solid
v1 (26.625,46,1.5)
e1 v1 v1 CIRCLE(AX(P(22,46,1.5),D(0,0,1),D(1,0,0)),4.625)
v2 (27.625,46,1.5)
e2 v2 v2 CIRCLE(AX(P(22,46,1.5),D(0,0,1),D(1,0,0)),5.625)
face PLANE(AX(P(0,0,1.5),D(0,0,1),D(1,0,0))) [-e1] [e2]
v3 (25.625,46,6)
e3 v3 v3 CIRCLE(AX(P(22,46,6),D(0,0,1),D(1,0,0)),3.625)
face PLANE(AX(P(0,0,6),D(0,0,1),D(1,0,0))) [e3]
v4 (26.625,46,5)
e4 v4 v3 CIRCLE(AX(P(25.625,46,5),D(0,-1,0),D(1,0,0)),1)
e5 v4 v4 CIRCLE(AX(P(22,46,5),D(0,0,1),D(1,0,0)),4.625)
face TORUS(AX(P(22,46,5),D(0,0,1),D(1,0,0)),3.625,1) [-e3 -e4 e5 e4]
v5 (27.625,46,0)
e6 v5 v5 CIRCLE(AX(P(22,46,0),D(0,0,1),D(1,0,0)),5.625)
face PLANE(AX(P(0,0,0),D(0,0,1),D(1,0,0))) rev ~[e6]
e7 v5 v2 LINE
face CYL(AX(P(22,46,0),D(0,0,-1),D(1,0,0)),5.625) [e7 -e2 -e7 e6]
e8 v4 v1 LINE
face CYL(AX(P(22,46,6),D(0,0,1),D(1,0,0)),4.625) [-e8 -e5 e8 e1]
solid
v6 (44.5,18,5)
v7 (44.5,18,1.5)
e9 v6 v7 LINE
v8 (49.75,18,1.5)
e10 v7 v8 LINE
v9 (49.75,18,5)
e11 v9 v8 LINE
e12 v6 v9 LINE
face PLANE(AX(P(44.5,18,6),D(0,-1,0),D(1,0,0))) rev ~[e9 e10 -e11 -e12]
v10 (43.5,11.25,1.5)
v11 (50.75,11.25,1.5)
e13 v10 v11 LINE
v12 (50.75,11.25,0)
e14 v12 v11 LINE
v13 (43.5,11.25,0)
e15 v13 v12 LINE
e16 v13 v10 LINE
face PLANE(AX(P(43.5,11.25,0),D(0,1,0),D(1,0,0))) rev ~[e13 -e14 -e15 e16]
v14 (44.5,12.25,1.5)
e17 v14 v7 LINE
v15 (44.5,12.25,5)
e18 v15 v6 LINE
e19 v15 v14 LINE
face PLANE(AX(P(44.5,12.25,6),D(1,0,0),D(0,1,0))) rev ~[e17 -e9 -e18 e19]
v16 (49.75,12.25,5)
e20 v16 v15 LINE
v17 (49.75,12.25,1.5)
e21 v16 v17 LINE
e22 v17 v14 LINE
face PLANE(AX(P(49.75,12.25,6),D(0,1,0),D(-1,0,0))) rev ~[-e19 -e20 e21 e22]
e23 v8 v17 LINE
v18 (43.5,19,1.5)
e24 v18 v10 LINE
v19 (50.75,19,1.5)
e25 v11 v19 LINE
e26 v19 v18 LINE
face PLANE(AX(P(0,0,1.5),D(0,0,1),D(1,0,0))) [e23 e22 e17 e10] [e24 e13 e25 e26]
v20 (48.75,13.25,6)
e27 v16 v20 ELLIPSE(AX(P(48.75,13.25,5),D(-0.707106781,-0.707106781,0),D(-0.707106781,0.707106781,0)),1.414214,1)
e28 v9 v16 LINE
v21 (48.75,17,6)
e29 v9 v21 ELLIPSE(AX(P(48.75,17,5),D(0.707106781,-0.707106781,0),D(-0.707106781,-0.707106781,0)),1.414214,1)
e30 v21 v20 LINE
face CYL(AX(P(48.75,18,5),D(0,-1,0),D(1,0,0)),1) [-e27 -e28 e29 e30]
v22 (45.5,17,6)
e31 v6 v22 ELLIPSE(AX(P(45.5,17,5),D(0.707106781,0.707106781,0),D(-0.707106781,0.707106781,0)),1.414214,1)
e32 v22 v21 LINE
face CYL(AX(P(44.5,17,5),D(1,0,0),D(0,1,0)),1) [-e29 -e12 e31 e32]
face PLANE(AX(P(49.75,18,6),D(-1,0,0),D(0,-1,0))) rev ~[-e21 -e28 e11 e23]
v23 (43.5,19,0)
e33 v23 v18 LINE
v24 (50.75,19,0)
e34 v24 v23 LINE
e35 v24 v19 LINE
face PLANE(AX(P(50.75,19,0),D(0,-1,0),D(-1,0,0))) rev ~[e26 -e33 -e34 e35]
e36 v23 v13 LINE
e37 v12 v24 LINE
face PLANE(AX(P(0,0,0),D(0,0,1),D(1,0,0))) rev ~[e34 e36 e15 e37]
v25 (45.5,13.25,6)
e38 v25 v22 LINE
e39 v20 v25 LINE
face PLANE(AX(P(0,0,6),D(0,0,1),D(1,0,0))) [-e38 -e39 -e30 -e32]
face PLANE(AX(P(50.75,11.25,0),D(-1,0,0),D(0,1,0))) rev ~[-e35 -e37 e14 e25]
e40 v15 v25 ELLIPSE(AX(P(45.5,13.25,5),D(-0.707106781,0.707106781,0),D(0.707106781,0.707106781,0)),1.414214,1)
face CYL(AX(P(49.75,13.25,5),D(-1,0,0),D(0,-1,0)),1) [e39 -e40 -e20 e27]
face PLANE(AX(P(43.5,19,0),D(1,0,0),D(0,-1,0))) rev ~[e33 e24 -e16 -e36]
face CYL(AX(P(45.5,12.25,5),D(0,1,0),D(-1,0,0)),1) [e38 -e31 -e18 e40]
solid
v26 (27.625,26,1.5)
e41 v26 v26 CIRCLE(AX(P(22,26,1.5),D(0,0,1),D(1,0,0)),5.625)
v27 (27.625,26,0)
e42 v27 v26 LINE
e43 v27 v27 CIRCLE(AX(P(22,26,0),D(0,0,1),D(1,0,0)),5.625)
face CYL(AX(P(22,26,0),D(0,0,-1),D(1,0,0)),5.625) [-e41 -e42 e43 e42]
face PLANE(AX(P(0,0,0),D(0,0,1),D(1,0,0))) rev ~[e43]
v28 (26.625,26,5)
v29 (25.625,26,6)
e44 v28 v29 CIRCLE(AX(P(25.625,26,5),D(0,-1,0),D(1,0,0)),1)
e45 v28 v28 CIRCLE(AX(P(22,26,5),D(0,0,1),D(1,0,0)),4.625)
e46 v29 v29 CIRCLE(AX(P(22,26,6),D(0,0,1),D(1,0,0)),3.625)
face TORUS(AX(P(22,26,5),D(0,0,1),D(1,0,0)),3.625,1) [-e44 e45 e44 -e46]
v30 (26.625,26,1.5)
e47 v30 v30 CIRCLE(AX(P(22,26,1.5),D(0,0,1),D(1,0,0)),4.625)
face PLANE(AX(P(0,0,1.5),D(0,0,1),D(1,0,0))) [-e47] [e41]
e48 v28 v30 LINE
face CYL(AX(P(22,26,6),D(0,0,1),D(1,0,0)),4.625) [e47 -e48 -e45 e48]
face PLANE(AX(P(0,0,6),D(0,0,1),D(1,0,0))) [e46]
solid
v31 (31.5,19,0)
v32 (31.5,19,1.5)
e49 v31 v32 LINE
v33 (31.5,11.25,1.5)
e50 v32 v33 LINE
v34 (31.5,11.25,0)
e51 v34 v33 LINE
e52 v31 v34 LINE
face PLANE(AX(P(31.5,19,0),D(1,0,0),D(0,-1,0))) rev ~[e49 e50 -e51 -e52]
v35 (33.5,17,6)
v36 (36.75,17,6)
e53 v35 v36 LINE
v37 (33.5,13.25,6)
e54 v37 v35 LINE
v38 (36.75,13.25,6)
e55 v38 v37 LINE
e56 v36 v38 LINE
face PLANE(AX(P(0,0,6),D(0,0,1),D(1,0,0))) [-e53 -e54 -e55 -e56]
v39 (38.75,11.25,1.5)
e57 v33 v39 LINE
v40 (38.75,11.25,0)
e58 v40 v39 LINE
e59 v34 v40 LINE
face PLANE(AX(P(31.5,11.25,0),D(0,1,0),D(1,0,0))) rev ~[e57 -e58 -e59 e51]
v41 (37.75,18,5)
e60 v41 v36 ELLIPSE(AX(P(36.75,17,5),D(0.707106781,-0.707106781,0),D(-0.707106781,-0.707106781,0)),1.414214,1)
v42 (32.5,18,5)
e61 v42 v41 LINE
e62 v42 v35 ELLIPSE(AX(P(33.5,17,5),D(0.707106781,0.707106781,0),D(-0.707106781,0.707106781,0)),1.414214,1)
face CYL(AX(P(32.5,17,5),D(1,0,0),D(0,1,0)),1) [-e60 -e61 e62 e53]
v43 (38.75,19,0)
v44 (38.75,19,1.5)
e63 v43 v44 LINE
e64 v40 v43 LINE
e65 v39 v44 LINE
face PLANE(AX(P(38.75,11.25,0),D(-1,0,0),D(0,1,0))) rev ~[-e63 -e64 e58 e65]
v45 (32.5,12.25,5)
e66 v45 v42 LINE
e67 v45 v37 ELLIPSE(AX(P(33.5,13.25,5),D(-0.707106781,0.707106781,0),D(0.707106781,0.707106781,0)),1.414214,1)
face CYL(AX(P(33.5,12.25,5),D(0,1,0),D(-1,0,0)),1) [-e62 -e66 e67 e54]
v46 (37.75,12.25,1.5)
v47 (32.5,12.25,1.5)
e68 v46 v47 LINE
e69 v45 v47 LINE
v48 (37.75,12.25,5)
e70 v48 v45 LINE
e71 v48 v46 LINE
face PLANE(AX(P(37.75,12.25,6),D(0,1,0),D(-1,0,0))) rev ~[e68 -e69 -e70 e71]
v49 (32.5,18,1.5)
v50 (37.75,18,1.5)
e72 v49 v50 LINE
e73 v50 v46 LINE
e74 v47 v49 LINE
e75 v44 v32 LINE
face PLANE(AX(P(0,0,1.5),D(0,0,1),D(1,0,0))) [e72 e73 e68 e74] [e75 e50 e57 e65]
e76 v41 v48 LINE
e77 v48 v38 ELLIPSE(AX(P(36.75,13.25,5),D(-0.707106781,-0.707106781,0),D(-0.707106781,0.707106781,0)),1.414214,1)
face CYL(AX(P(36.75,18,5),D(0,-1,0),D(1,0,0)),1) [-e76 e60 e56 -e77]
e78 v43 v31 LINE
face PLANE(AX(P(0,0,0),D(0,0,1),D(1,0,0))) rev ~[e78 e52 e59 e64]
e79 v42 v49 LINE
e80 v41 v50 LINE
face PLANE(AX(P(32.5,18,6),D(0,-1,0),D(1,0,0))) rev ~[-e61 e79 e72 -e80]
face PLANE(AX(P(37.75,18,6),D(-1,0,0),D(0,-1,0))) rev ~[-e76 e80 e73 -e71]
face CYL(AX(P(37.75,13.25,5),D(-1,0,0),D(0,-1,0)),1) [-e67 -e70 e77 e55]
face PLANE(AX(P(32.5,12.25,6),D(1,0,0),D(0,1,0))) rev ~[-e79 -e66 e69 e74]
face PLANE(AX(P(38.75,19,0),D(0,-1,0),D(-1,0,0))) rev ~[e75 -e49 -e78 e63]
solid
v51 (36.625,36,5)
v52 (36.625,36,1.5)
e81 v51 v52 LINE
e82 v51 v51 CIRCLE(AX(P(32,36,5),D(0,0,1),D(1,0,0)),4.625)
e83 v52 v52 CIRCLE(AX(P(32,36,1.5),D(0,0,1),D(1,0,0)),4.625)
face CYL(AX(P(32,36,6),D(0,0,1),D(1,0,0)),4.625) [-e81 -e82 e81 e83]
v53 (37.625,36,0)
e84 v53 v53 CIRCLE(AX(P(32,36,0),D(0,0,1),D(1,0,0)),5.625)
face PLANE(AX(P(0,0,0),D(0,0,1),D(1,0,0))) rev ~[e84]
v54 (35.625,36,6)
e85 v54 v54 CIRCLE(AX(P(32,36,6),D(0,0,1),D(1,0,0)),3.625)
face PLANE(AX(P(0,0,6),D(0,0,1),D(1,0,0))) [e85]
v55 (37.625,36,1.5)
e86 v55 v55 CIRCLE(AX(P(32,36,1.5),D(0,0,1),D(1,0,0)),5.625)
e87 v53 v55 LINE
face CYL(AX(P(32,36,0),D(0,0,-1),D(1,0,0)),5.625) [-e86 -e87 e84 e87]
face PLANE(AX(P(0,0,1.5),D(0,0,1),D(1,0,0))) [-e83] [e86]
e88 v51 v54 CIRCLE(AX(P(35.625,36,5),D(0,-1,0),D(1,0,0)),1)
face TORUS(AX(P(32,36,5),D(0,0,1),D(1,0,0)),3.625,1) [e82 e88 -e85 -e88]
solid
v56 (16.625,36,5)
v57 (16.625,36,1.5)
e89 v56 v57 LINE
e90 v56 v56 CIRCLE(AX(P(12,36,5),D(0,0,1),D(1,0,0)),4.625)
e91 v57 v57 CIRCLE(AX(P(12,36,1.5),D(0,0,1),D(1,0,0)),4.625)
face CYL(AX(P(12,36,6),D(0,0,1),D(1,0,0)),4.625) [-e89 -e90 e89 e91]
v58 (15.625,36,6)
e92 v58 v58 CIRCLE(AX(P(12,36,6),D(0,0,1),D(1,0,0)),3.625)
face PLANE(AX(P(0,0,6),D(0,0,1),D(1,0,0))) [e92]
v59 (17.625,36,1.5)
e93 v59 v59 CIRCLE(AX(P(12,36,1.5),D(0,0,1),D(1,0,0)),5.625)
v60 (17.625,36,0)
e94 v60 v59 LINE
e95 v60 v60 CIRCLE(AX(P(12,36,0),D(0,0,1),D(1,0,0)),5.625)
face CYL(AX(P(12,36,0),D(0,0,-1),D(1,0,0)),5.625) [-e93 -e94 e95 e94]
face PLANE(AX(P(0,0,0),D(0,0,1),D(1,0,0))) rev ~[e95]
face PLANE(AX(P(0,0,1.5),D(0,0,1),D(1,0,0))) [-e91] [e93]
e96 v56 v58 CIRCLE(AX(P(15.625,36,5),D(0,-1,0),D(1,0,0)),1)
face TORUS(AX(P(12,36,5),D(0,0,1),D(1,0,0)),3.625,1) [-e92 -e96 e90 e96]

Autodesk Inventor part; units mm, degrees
ref_plane "YZ Plane" through (0, 0, 0) normal (1, 0, 0) x (0, 1, 0)
ref_plane "XZ Plane" through (0, 0, 0) normal (0, 1, 0) x (-1, 0, 0)
ref_plane "XY Plane" through (0, 0, 0) normal (0, 0, 1) x (1, 0, 0)
sketch "Sketch1" plane through (0, 0, 0) normal (0, 0, 1) x (1, 0, 0)
  circle A0 centre (22, 46) radius 4.5
  circle A1 centre (12, 36) radius 4.5
  circle A2 centre (22, 26) radius 4.5
  circle A3 centre (32, 36) radius 4.5
  line L0 (37.75, 18) -> (32.5, 18)
  line L1 (32.5, 18) -> (32.5, 12.25)
  line L2 (32.5, 12.25) -> (37.75, 12.25)
  line L3 (37.75, 12.25) -> (37.75, 18)
  line L4 (44.5, 18) -> (49.75, 18)
  line L5 (49.75, 18) -> (49.75, 12.25)
  line L6 (49.75, 12.25) -> (44.5, 12.25)
  line L7 (44.5, 12.25) -> (44.5, 18)
  circle A4 centre (12, 36) radius 5.625
  circle A5 centre (22, 46) radius 5.625
  circle A6 centre (32, 36) radius 5.625
  circle A7 centre (22, 26) radius 5.625
  line L8 (38.75, 19) -> (31.5, 19)
  line L9 (31.5, 19) -> (31.5, 11.25)
  line L10 (31.5, 11.25) -> (38.75, 11.25)
  line L11 (38.75, 11.25) -> (38.75, 19)
  line L12 (50.75, 19) -> (43.5, 19)
  line L13 (43.5, 19) -> (43.5, 11.25)
  line L14 (43.5, 11.25) -> (50.75, 11.25)
  line L15 (50.75, 11.25) -> (50.75, 19)
  point P0 (18.75, 39)
  point P1 (18.75, 32.5)
  dimension "d35" = 11.25
  dimension "d36" = 11.25
  dimension "d37" = 11.25
  dimension "d38" = 11.25
  dimension "d43" = 7.75
  dimension "d44" = 7.75
  dimension "d45" = 7.25
  dimension "d46" = 7.25
  dimension "d47" = 5.75
  dimension "d48" = 5.25
  dimension "d49" = 5.75
  dimension "d50" = 5.25
extrude "Extrusion1" add sketch "Sketch1" along normal blind 6 contours A0 | A1 | A2 | A3 | L3 L2 L1 L0 | L4 L5 L6 L7 | A4 | A5 | A6 | A7 | L11 L10 L9 L8 | L15 L14 L13 L12
sketch "Sketch2" plane through (0, 0, 6) normal (0, 0, 1) x (1, 0, 0)
  circle A0 centre (22, 46) radius 4.625
  circle A1 centre (12, 36) radius 4.625
  circle A2 centre (22, 26) radius 4.625
  circle A3 centre (32, 36) radius 4.625
  circle A4 centre (22, 46) radius 5.625
  circle A5 centre (12, 36) radius 5.625
  circle A6 centre (22, 26) radius 5.625
  circle A7 centre (32, 36) radius 5.625
  line L0 (31.5, 19) -> (31.5, 11.25) projected
  line L1 (38.75, 11.25) -> (38.75, 19) projected
  line L2 (31.5, 19) -> (38.75, 19)
  line L3 (38.75, 19) -> (38.75, 11.25)
  line L4 (38.75, 11.25) -> (31.5, 11.25)
  line L5 (31.5, 11.25) -> (31.5, 19)
  line L6 (50.75, 19) -> (43.5, 19) projected
  line L7 (43.5, 11.25) -> (50.75, 11.25) projected
  line L8 (43.5, 19) -> (50.75, 19)
  line L9 (50.75, 19) -> (50.75, 11.25)
  line L10 (50.75, 11.25) -> (43.5, 11.25)
  line L11 (43.5, 11.25) -> (43.5, 19)
  line L12 (37.75, 18) -> (32.5, 18)
  line L13 (32.5, 18) -> (32.5, 12.25)
  line L14 (32.5, 12.25) -> (37.75, 12.25)
  line L15 (37.75, 12.25) -> (37.75, 18)
  line L16 (44.5, 18) -> (49.75, 18)
  line L17 (49.75, 18) -> (49.75, 12.25)
  line L18 (49.75, 12.25) -> (44.5, 12.25)
  line L19 (44.5, 12.25) -> (44.5, 18)
  dimension "d16" = 1
  dimension "d17" = 1
  dimension "d18" = 1
  dimension "d19" = 1
  dimension "d39" = 11.25
  dimension "d40" = 11.25
  dimension "d41" = 11.25
  dimension "d42" = 11.25
  dimension "d51" = 1
  dimension "d52" = 1
extrude "Extrusion2" cut sketch "Sketch2" against normal blind 4.5 contours A4 | A5 | A6 | A7
fillet "Fillet2" radius 1 4 edges at (17.375, 46, 6) (27.375, 36, 6) (17.375, 26, 6) (7.375, 36, 6)
sketch "Sketch5" plane through (0, 0, 6) normal (0, 0, 1) x (1, 0, 0)
  line L0 (31.5, 19) -> (31.5, 11.25) projected
  line L1 (38.75, 11.25) -> (38.75, 19) projected
  line L2 (31.5, 11.25) -> (38.75, 11.25)
  line L3 (38.75, 11.25) -> (38.75, 19)
  line L4 (38.75, 19) -> (31.5, 19)
  line L5 (31.5, 19) -> (31.5, 11.25)
  line L6 (32.5, 18) -> (37.75, 18)
  line L7 (37.75, 18) -> (37.75, 12.25)
  line L8 (37.75, 12.25) -> (32.5, 12.25)
  line L9 (32.5, 12.25) -> (32.5, 18)
  line L10 (43.5, 11.25) -> (50.75, 11.25) projected
  line L11 (50.75, 11.25) -> (50.75, 19) projected
  line L12 (43.5, 11.25) -> (50.75, 11.25)
  line L13 (50.75, 11.25) -> (50.75, 19)
  line L14 (50.75, 19) -> (43.5, 19)
  line L15 (43.5, 19) -> (43.5, 11.25)
  line L16 (44.5, 18) -> (49.75, 18)
  line L17 (49.75, 18) -> (49.75, 12.25)
  line L18 (49.75, 12.25) -> (44.5, 12.25)
  line L19 (44.5, 12.25) -> (44.5, 18)
  point P0 (0, 0)
  point P1 (43.5, 19)
  dimension "d37" = 11.25
  dimension "d58" = 1
  dimension "d60" = 1
extrude "Extrusion5" cut sketch "Sketch5" against normal blind 4.5
fillet "Fillet5" radius 1 8 edges at (32.5, 15.125, 6) (35.125, 12.25, 6) (37.75, 15.125, 6) (35.125, 18, 6) (44.5, 15.125, 6) (47.125, 12.25, 6) (49.75, 15.125, 6) (47.125, 18, 6)
properties part number "Groboy Buttons"
